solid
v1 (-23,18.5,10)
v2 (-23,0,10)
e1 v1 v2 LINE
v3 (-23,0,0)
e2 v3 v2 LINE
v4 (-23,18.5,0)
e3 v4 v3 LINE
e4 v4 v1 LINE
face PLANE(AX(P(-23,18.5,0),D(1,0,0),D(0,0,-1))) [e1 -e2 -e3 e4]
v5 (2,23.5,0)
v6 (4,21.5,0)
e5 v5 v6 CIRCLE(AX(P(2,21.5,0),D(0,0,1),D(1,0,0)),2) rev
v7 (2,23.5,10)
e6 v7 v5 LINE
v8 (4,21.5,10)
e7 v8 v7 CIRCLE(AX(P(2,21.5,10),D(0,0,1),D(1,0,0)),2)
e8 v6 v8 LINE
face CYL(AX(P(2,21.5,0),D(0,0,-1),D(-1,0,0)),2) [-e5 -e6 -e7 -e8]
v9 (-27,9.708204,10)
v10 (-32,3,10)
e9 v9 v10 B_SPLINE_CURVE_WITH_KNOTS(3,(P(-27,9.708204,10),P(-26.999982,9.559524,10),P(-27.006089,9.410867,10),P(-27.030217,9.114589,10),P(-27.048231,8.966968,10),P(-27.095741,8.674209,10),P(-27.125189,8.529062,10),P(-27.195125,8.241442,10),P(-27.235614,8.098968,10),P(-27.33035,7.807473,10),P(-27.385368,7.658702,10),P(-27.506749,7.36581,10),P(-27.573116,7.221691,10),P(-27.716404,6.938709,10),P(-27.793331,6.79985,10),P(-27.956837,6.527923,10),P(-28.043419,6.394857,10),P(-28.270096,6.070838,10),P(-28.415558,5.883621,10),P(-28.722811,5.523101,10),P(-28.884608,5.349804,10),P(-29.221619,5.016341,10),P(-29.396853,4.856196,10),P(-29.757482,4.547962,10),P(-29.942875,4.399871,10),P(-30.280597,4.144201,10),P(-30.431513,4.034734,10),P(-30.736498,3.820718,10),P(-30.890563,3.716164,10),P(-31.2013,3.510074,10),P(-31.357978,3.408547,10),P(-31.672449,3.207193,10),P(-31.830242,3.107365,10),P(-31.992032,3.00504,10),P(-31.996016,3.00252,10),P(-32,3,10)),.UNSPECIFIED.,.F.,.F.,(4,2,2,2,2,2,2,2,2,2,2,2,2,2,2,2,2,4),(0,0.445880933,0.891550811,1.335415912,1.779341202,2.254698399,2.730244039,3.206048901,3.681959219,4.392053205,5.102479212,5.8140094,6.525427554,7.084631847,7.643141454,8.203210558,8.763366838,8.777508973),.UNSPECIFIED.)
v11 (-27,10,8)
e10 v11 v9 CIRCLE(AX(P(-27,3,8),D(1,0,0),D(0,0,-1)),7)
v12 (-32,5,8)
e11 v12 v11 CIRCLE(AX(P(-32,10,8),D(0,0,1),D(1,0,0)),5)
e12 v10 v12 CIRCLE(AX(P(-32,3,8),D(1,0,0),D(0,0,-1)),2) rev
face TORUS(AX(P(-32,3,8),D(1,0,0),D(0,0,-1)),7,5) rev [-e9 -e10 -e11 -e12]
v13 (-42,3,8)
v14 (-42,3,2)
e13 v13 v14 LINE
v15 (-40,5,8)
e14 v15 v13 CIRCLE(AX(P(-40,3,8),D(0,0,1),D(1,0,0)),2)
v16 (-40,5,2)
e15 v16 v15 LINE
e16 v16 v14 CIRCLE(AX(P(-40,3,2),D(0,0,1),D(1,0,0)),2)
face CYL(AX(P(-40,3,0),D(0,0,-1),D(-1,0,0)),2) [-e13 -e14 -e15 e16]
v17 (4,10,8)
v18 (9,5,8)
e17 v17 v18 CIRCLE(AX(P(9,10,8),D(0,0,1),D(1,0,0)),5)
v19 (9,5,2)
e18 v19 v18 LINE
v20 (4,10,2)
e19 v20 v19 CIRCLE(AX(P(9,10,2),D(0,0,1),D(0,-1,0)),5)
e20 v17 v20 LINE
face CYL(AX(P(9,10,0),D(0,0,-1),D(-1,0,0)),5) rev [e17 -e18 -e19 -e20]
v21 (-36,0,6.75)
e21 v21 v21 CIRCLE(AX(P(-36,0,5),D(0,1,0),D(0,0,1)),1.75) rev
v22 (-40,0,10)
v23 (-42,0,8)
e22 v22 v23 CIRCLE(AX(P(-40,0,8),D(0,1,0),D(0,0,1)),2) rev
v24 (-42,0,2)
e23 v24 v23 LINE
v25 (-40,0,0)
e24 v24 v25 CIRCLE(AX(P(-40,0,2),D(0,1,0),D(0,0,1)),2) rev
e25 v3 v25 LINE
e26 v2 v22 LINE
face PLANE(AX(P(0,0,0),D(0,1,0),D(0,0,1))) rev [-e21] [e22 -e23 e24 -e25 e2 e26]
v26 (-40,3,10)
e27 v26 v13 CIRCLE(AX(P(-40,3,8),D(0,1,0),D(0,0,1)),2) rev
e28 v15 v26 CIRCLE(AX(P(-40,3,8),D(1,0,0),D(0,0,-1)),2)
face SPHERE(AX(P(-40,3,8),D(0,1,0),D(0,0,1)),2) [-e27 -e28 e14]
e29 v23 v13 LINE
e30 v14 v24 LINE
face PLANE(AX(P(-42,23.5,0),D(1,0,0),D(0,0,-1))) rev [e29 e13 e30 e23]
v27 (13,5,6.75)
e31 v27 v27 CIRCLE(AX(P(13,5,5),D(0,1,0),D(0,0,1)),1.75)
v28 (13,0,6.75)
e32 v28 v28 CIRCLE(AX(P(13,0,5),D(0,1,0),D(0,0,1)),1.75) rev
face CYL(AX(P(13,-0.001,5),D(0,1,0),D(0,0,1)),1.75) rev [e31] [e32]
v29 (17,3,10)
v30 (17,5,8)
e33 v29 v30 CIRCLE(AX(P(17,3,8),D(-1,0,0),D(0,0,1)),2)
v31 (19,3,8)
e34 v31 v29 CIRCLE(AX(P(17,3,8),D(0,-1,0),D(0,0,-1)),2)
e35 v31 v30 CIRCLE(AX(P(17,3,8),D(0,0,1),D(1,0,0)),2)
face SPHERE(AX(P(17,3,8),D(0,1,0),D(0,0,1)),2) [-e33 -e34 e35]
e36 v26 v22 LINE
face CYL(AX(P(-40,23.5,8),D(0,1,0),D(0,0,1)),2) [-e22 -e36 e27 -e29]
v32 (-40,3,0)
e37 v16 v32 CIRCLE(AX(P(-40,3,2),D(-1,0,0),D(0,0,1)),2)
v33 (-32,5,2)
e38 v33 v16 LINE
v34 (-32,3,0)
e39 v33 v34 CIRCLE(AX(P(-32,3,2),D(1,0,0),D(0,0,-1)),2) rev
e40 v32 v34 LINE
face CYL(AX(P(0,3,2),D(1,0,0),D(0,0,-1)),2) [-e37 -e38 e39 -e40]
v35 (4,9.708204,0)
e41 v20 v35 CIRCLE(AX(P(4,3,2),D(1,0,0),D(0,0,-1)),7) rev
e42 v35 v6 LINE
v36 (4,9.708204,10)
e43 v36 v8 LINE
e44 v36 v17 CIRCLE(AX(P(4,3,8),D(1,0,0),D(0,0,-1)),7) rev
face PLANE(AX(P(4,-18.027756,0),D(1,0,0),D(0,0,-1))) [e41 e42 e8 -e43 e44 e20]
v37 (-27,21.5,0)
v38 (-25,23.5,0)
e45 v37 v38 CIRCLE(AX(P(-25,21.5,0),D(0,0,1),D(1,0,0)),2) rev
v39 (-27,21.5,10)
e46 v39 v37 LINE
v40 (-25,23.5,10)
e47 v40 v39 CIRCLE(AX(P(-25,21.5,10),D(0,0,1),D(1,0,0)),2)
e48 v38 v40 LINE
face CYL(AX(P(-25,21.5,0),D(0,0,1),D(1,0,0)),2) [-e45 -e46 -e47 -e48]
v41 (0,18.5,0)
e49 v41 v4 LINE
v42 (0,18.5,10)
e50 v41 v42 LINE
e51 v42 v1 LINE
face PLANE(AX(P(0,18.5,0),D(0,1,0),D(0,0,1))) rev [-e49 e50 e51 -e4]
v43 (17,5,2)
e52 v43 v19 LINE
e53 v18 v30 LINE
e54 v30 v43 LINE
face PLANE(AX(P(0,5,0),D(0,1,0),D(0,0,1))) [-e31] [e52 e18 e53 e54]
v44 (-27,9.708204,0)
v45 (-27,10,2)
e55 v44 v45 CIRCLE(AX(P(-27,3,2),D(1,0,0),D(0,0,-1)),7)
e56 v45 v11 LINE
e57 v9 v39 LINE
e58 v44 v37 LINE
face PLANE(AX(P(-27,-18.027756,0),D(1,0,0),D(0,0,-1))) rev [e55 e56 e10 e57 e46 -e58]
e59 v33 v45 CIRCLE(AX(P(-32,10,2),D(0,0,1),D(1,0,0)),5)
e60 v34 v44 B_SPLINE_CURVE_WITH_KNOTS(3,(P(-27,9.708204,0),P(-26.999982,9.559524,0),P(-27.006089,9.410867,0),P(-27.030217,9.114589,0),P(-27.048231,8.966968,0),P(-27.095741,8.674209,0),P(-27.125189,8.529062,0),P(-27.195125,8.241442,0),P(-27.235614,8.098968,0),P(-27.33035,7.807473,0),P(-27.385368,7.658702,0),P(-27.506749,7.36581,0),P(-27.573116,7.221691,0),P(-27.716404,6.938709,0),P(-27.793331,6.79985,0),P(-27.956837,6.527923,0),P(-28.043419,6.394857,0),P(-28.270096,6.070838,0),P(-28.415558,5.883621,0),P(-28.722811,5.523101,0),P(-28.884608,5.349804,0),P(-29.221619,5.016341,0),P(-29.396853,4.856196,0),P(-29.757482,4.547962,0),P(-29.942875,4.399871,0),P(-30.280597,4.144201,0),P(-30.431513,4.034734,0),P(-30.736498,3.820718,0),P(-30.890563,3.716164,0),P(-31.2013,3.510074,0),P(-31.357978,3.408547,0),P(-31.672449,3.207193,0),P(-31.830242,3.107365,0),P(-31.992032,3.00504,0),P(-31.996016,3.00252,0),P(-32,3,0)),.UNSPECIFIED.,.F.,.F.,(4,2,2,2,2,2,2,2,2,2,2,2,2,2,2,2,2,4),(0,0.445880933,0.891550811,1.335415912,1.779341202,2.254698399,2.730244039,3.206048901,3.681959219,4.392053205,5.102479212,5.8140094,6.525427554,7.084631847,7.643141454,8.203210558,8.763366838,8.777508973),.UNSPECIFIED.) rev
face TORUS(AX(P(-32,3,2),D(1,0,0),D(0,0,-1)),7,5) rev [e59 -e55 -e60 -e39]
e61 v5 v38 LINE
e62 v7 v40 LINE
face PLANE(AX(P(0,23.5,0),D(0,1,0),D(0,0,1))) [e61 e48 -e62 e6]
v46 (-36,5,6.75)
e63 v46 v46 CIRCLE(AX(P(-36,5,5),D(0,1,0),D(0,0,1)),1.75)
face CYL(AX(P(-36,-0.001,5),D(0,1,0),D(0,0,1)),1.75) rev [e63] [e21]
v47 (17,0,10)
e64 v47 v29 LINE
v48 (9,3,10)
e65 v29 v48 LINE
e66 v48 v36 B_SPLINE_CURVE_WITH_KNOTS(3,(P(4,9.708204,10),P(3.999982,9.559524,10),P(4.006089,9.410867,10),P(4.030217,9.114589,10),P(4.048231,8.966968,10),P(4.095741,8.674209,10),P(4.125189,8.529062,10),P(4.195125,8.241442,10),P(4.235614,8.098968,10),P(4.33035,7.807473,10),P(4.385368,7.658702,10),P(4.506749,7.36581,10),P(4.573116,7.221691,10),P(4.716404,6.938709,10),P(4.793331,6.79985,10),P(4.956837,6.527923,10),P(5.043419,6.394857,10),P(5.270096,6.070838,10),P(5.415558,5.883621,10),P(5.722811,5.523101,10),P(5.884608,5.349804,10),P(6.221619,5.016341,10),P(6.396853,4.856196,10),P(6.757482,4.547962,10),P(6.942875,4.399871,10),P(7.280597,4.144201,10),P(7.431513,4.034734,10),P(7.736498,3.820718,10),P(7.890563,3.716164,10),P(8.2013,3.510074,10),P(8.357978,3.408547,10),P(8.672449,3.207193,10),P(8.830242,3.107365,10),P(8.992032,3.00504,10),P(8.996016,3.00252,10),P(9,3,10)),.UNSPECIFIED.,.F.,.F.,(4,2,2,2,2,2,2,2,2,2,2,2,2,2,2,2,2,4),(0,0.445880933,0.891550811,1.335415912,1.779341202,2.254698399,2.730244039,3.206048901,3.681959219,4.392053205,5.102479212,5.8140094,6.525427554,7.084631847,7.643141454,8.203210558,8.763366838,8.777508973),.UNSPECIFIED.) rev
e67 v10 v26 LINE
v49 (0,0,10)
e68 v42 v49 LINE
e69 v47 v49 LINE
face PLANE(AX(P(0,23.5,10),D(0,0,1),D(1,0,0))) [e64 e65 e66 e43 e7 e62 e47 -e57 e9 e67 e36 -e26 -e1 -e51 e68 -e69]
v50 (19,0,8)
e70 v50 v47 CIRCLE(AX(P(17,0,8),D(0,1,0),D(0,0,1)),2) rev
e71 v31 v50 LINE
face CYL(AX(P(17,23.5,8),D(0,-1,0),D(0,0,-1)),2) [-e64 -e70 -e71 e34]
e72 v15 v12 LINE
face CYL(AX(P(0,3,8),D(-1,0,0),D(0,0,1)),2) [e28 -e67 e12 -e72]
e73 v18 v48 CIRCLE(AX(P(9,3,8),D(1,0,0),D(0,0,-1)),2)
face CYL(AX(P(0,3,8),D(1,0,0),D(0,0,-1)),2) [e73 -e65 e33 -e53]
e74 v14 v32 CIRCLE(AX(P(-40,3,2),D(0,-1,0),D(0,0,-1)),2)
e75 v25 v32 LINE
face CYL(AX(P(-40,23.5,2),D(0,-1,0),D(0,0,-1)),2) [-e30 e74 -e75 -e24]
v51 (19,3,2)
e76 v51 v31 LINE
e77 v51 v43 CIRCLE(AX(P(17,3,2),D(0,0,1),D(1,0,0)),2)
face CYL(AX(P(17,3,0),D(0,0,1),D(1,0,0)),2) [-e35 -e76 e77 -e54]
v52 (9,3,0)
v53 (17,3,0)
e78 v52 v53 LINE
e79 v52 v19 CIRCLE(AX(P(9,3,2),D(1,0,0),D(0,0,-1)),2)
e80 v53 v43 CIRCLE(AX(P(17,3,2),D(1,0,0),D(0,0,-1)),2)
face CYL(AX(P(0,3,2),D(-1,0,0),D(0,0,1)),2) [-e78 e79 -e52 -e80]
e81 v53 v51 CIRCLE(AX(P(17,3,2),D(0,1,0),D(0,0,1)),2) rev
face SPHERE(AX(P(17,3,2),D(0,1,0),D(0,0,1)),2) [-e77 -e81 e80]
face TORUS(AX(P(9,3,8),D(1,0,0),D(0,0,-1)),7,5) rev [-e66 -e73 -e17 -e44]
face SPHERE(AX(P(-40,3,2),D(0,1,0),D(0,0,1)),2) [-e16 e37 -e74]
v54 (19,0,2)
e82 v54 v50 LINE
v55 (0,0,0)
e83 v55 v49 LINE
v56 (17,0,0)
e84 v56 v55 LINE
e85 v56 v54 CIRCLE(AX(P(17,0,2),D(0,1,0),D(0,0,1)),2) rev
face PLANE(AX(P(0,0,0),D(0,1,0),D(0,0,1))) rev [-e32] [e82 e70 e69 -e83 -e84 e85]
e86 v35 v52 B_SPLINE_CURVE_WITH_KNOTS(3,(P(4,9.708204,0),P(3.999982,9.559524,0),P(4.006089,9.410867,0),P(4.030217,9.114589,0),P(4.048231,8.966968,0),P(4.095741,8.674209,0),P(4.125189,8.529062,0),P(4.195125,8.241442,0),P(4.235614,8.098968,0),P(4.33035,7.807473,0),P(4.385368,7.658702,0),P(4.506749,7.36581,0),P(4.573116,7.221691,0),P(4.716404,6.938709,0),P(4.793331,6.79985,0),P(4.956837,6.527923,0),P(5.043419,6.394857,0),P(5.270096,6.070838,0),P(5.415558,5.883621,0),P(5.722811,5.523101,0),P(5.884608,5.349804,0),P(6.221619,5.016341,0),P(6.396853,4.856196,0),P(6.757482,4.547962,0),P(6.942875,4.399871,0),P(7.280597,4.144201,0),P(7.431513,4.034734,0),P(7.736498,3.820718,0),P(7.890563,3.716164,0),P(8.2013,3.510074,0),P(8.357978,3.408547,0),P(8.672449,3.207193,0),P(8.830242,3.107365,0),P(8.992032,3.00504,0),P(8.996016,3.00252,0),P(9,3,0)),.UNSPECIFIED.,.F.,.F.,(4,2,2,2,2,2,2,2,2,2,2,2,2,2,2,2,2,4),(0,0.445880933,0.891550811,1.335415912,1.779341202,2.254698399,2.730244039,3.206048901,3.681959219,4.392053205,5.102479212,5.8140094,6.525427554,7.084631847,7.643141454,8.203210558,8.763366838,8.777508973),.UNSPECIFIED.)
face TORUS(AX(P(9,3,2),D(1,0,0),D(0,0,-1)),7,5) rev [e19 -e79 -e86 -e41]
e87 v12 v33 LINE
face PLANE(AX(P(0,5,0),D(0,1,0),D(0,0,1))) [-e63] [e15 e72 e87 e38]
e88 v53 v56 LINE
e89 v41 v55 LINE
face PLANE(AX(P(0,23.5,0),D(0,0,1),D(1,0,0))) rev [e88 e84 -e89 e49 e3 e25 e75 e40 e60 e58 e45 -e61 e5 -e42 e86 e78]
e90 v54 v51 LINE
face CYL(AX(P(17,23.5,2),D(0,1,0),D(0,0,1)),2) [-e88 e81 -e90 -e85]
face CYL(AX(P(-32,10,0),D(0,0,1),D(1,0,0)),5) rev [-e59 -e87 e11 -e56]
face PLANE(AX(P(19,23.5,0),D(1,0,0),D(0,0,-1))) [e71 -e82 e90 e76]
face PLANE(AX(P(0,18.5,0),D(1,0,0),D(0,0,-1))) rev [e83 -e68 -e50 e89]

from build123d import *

# Parameters (mm, degrees)
SKETCH1_W           = 15
SKETCH1_H           = 10
SKETCH1_W_2         = 4
SKETCH1_W_3         = 23
BOSS_EXTRUDE1_DEPTH = 23.5
SKETCH1_3_W         = 23
SKETCH1_3_H         = 10
CUT_EXTRUDE1_DEPTH  = 18.5
CUT_EXTRUDE2_START  = 23.5
SKETCH1_4_W         = 15
SKETCH1_4_H         = 10
CUT_EXTRUDE2_DEPTH  = 18.5
FILLET1_R           = 2
FILLET2_R           = 2
FILLET3_R           = 5
CUT_EXTRUDE3_REACH  = 48.971
SKETCH2_R           = 1.75


with BuildPart() as part:
    # Sketch1 → Boss-Extrude1 (new body)
    with BuildSketch(Plane(origin=(0, 0, 0), x_dir=(1, 0, 0), z_dir=(0, 1, 0))):
        with Locations((-34.5, -5)):
            Rectangle(SKETCH1_W, SKETCH1_H)
        with Locations((-25, -5)):
            Rectangle(SKETCH1_W_2, SKETCH1_H)
        with Locations((-11.5, -5)):
            Rectangle(SKETCH1_W_3, SKETCH1_H)
        with Locations((2, -5)):
            Rectangle(SKETCH1_W_2, SKETCH1_H)
        with Locations((11.5, -5)):
            Rectangle(SKETCH1_W, SKETCH1_H)
    extrude(amount=BOSS_EXTRUDE1_DEPTH)

    # Sketch1<3> → Cut-Extrude1 (cut)
    with BuildSketch(Plane(origin=(0, 0, 0), x_dir=(1, 0, 0), z_dir=(0, 1, 0))):
        with Locations((-11.5, -5)):
            Rectangle(SKETCH1_3_W, SKETCH1_3_H)
    extrude(amount=CUT_EXTRUDE1_DEPTH, mode=Mode.SUBTRACT)

    # Sketch1<4> → Cut-Extrude2 (cut)
    with BuildSketch(Plane(origin=(0, 0, 0), x_dir=(1, 0, 0), z_dir=(0, 1, 0)).offset(CUT_EXTRUDE2_START)):
        with Locations((-34.5, -5)):
            Rectangle(SKETCH1_4_W, SKETCH1_4_H)
        with Locations((11.5, -5)):
            Rectangle(SKETCH1_4_W, SKETCH1_4_H)
    extrude(amount=-CUT_EXTRUDE2_DEPTH, mode=Mode.SUBTRACT)

    # Fillet1
    fillet1_edges = [part.edges().sort_by_distance(p)[0] for p in [
        (19, 2.5, 0),
        (19, 2.5, 10),
        (-42, 2.5, 10),
        (-42, 2.5, 0),
        (-27, 23.5, 5),
        (4, 23.5, 5),
    ]]
    fillet(fillet1_edges, radius=FILLET1_R)

    # Fillet2
    fillet2_edges = [part.edges().sort_by_distance(p)[0] for p in [
        (-33.5, 5, 0),
        (-33.5, 5, 10),
        (10.5, 5, 10),
        (10.5, 5, 0),
        (19, 5, 5),
        (18.414213562, 5, 9.414213562),
        (18.414213562, 5, 0.585786438),
        (-42, 5, 5),
        (-41.414213562, 5, 9.414213562),
        (-41.414213562, 5, 0.585786438),
    ]]
    fillet(fillet2_edges, radius=FILLET2_R)

    # Fillet3
    # the kernel refuses this fillet: 5 mm, written as the material it adds along each edge
    with BuildSketch(Plane(origin=(-27, 5, 8), x_dir=(-1, 0, 0), z_dir=(0, 0, -1))) as fillet3_piece_1:
        with BuildLine():
            CenterArc((FILLET3_R, FILLET3_R), FILLET3_R, 180, 90)
            Line((0, FILLET3_R), (0, 0))
            Line((0, 0), (FILLET3_R, 0))
        make_face()
    extrude(amount=6)
    with BuildSketch(Plane(origin=(4, 5, 8), x_dir=(1, 0, 0), z_dir=(0, 0, -1))) as fillet3_piece_2:
        with BuildLine():
            CenterArc((FILLET3_R, -FILLET3_R), FILLET3_R, 90, 90)
            Line((0, -FILLET3_R), (0, 0))
            Line((0, 0), (FILLET3_R, 0))
        make_face()
    extrude(amount=6)
    with BuildSketch(Plane(origin=(-27, 3, 8), x_dir=(0, 0.9999802608561372, -0.006283143965558846), z_dir=(0, 0.006283143965558846, 0.9999802608561372))) as fillet3_piece_3_section:
        with BuildLine():
            CenterArc((-2 - FILLET3_R, FILLET3_R), FILLET3_R, 270, 90)
            Line((-2 - FILLET3_R, 0), (-2, 0))
            Line((-2, 0), (-2, FILLET3_R))
        make_face()
    fillet3_piece_3 = revolve(axis=Axis((-27, 3, 8), (-1, 0, 0)), revolution_arc=359.64, mode=Mode.PRIVATE)
    fillet3_piece_3 = split(fillet3_piece_3, bisect_by=Plane(origin=(-28.84257052, 4.524977571, 10), z_dir=(0, 0, -1)), keep=Keep.TOP, mode=Mode.PRIVATE)
    fillet3_piece_3 = split(fillet3_piece_3, bisect_by=Plane(origin=(-28.84257052, 0, 9.524977571), z_dir=(0, 1, 0)), keep=Keep.TOP, mode=Mode.PRIVATE)
    add(fillet3_piece_3)
    with BuildSketch(Plane(origin=(4, 3, 8), x_dir=(0, 1, 0), z_dir=(0, 0, -1))) as fillet3_piece_4_section:
        with BuildLine():
            CenterArc((2 + FILLET3_R, FILLET3_R), FILLET3_R, 180, 90)
            Line((2 + FILLET3_R, 0), (2, 0))
            Line((2, 0), (2, FILLET3_R))
        make_face()
    fillet3_piece_4 = revolve(axis=Axis((4, 3, 8), (1, 0, 0)), revolution_arc=359.64, mode=Mode.PRIVATE)
    fillet3_piece_4 = split(fillet3_piece_4, bisect_by=Plane(origin=(5.842570594, 4.524977559, 10), z_dir=(0, 0, -1)), keep=Keep.TOP, mode=Mode.PRIVATE)
    fillet3_piece_4 = split(fillet3_piece_4, bisect_by=Plane(origin=(5.842570594, 0, 9.524977563), z_dir=(0, 1, 0)), keep=Keep.TOP, mode=Mode.PRIVATE)
    add(fillet3_piece_4)
    with BuildSketch(Plane(origin=(-27, 3, 2), x_dir=(0, 0.9999802608561372, 0.006283143965559623), z_dir=(0, 0.006283143965559623, -0.9999802608561372))) as fillet3_piece_5_section:
        with BuildLine():
            CenterArc((-2 - FILLET3_R, -FILLET3_R), FILLET3_R, 0, 90)
            Line((-2 - FILLET3_R, 0), (-2, 0))
            Line((-2, 0), (-2, -FILLET3_R))
        make_face()
    fillet3_piece_5 = revolve(axis=Axis((-27, 3, 2), (1, 0, 0)), revolution_arc=359.64, mode=Mode.PRIVATE)
    fillet3_piece_5 = split(fillet3_piece_5, bisect_by=Plane(origin=(-28.842570484, 4.524977653, 0), z_dir=(0, 0, 1)), keep=Keep.TOP, mode=Mode.PRIVATE)
    fillet3_piece_5 = split(fillet3_piece_5, bisect_by=Plane(origin=(-28.842570484, 0, 0.47502245), z_dir=(0, 1, 0)), keep=Keep.TOP, mode=Mode.PRIVATE)
    add(fillet3_piece_5)
    with BuildSketch(Plane(origin=(4, 3, 2), x_dir=(0, 1, 0), z_dir=(0, 0, 1))) as fillet3_piece_6_section:
        with BuildLine():
            CenterArc((2 + FILLET3_R, -FILLET3_R), FILLET3_R, 90, 90)
            Line((2, -FILLET3_R), (2, 0))
            Line((2, 0), (2 + FILLET3_R, 0))
        make_face()
    fillet3_piece_6 = revolve(axis=Axis((4, 3, 2), (-1, 0, 0)), revolution_arc=359.64, mode=Mode.PRIVATE)
    fillet3_piece_6 = split(fillet3_piece_6, bisect_by=Plane(origin=(4.944030812, 6.137069115, 0), z_dir=(0, 0, 1)), keep=Keep.TOP, mode=Mode.PRIVATE)
    fillet3_piece_6 = split(fillet3_piece_6, bisect_by=Plane(origin=(4.944030812, 0, 1.077199574), z_dir=(0, 1, 0)), keep=Keep.TOP, mode=Mode.PRIVATE)
    add(fillet3_piece_6)

    # Sketch2 → Cut-Extrude3 (cut, up to next)
    with BuildSketch(Plane(origin=(0, 5, 0), x_dir=(1, 0, 0), z_dir=(0, 1, 0)), mode=Mode.PRIVATE) as cut_extrude3_sk1:
        with Locations(Location((13, -5, 0), (0, 0, 270))):
            Circle(SKETCH2_R)
    cut_extrude3_tool1 = extrude(cut_extrude3_sk1.sketch, amount=-CUT_EXTRUDE3_REACH, mode=Mode.PRIVATE) & part.part
    # Sketch2 → Cut-Extrude3 (cut, up to next)
    with BuildSketch(Plane(origin=(0, 5, 0), x_dir=(1, 0, 0), z_dir=(0, 1, 0)), mode=Mode.PRIVATE) as cut_extrude3_sk2:
        with Locations(Location((-36, -5, 0), (0, 0, 270))):
            Circle(SKETCH2_R)
    cut_extrude3_tool2 = extrude(cut_extrude3_sk2.sketch, amount=-CUT_EXTRUDE3_REACH, mode=Mode.PRIVATE) & part.part
    add(cut_extrude3_tool1.solids().sort_by_distance((13, 5, 5))[0], mode=Mode.SUBTRACT)
    add(cut_extrude3_tool2.solids().sort_by_distance((-36, 5, 5))[0], mode=Mode.SUBTRACT)


solid = part.part
